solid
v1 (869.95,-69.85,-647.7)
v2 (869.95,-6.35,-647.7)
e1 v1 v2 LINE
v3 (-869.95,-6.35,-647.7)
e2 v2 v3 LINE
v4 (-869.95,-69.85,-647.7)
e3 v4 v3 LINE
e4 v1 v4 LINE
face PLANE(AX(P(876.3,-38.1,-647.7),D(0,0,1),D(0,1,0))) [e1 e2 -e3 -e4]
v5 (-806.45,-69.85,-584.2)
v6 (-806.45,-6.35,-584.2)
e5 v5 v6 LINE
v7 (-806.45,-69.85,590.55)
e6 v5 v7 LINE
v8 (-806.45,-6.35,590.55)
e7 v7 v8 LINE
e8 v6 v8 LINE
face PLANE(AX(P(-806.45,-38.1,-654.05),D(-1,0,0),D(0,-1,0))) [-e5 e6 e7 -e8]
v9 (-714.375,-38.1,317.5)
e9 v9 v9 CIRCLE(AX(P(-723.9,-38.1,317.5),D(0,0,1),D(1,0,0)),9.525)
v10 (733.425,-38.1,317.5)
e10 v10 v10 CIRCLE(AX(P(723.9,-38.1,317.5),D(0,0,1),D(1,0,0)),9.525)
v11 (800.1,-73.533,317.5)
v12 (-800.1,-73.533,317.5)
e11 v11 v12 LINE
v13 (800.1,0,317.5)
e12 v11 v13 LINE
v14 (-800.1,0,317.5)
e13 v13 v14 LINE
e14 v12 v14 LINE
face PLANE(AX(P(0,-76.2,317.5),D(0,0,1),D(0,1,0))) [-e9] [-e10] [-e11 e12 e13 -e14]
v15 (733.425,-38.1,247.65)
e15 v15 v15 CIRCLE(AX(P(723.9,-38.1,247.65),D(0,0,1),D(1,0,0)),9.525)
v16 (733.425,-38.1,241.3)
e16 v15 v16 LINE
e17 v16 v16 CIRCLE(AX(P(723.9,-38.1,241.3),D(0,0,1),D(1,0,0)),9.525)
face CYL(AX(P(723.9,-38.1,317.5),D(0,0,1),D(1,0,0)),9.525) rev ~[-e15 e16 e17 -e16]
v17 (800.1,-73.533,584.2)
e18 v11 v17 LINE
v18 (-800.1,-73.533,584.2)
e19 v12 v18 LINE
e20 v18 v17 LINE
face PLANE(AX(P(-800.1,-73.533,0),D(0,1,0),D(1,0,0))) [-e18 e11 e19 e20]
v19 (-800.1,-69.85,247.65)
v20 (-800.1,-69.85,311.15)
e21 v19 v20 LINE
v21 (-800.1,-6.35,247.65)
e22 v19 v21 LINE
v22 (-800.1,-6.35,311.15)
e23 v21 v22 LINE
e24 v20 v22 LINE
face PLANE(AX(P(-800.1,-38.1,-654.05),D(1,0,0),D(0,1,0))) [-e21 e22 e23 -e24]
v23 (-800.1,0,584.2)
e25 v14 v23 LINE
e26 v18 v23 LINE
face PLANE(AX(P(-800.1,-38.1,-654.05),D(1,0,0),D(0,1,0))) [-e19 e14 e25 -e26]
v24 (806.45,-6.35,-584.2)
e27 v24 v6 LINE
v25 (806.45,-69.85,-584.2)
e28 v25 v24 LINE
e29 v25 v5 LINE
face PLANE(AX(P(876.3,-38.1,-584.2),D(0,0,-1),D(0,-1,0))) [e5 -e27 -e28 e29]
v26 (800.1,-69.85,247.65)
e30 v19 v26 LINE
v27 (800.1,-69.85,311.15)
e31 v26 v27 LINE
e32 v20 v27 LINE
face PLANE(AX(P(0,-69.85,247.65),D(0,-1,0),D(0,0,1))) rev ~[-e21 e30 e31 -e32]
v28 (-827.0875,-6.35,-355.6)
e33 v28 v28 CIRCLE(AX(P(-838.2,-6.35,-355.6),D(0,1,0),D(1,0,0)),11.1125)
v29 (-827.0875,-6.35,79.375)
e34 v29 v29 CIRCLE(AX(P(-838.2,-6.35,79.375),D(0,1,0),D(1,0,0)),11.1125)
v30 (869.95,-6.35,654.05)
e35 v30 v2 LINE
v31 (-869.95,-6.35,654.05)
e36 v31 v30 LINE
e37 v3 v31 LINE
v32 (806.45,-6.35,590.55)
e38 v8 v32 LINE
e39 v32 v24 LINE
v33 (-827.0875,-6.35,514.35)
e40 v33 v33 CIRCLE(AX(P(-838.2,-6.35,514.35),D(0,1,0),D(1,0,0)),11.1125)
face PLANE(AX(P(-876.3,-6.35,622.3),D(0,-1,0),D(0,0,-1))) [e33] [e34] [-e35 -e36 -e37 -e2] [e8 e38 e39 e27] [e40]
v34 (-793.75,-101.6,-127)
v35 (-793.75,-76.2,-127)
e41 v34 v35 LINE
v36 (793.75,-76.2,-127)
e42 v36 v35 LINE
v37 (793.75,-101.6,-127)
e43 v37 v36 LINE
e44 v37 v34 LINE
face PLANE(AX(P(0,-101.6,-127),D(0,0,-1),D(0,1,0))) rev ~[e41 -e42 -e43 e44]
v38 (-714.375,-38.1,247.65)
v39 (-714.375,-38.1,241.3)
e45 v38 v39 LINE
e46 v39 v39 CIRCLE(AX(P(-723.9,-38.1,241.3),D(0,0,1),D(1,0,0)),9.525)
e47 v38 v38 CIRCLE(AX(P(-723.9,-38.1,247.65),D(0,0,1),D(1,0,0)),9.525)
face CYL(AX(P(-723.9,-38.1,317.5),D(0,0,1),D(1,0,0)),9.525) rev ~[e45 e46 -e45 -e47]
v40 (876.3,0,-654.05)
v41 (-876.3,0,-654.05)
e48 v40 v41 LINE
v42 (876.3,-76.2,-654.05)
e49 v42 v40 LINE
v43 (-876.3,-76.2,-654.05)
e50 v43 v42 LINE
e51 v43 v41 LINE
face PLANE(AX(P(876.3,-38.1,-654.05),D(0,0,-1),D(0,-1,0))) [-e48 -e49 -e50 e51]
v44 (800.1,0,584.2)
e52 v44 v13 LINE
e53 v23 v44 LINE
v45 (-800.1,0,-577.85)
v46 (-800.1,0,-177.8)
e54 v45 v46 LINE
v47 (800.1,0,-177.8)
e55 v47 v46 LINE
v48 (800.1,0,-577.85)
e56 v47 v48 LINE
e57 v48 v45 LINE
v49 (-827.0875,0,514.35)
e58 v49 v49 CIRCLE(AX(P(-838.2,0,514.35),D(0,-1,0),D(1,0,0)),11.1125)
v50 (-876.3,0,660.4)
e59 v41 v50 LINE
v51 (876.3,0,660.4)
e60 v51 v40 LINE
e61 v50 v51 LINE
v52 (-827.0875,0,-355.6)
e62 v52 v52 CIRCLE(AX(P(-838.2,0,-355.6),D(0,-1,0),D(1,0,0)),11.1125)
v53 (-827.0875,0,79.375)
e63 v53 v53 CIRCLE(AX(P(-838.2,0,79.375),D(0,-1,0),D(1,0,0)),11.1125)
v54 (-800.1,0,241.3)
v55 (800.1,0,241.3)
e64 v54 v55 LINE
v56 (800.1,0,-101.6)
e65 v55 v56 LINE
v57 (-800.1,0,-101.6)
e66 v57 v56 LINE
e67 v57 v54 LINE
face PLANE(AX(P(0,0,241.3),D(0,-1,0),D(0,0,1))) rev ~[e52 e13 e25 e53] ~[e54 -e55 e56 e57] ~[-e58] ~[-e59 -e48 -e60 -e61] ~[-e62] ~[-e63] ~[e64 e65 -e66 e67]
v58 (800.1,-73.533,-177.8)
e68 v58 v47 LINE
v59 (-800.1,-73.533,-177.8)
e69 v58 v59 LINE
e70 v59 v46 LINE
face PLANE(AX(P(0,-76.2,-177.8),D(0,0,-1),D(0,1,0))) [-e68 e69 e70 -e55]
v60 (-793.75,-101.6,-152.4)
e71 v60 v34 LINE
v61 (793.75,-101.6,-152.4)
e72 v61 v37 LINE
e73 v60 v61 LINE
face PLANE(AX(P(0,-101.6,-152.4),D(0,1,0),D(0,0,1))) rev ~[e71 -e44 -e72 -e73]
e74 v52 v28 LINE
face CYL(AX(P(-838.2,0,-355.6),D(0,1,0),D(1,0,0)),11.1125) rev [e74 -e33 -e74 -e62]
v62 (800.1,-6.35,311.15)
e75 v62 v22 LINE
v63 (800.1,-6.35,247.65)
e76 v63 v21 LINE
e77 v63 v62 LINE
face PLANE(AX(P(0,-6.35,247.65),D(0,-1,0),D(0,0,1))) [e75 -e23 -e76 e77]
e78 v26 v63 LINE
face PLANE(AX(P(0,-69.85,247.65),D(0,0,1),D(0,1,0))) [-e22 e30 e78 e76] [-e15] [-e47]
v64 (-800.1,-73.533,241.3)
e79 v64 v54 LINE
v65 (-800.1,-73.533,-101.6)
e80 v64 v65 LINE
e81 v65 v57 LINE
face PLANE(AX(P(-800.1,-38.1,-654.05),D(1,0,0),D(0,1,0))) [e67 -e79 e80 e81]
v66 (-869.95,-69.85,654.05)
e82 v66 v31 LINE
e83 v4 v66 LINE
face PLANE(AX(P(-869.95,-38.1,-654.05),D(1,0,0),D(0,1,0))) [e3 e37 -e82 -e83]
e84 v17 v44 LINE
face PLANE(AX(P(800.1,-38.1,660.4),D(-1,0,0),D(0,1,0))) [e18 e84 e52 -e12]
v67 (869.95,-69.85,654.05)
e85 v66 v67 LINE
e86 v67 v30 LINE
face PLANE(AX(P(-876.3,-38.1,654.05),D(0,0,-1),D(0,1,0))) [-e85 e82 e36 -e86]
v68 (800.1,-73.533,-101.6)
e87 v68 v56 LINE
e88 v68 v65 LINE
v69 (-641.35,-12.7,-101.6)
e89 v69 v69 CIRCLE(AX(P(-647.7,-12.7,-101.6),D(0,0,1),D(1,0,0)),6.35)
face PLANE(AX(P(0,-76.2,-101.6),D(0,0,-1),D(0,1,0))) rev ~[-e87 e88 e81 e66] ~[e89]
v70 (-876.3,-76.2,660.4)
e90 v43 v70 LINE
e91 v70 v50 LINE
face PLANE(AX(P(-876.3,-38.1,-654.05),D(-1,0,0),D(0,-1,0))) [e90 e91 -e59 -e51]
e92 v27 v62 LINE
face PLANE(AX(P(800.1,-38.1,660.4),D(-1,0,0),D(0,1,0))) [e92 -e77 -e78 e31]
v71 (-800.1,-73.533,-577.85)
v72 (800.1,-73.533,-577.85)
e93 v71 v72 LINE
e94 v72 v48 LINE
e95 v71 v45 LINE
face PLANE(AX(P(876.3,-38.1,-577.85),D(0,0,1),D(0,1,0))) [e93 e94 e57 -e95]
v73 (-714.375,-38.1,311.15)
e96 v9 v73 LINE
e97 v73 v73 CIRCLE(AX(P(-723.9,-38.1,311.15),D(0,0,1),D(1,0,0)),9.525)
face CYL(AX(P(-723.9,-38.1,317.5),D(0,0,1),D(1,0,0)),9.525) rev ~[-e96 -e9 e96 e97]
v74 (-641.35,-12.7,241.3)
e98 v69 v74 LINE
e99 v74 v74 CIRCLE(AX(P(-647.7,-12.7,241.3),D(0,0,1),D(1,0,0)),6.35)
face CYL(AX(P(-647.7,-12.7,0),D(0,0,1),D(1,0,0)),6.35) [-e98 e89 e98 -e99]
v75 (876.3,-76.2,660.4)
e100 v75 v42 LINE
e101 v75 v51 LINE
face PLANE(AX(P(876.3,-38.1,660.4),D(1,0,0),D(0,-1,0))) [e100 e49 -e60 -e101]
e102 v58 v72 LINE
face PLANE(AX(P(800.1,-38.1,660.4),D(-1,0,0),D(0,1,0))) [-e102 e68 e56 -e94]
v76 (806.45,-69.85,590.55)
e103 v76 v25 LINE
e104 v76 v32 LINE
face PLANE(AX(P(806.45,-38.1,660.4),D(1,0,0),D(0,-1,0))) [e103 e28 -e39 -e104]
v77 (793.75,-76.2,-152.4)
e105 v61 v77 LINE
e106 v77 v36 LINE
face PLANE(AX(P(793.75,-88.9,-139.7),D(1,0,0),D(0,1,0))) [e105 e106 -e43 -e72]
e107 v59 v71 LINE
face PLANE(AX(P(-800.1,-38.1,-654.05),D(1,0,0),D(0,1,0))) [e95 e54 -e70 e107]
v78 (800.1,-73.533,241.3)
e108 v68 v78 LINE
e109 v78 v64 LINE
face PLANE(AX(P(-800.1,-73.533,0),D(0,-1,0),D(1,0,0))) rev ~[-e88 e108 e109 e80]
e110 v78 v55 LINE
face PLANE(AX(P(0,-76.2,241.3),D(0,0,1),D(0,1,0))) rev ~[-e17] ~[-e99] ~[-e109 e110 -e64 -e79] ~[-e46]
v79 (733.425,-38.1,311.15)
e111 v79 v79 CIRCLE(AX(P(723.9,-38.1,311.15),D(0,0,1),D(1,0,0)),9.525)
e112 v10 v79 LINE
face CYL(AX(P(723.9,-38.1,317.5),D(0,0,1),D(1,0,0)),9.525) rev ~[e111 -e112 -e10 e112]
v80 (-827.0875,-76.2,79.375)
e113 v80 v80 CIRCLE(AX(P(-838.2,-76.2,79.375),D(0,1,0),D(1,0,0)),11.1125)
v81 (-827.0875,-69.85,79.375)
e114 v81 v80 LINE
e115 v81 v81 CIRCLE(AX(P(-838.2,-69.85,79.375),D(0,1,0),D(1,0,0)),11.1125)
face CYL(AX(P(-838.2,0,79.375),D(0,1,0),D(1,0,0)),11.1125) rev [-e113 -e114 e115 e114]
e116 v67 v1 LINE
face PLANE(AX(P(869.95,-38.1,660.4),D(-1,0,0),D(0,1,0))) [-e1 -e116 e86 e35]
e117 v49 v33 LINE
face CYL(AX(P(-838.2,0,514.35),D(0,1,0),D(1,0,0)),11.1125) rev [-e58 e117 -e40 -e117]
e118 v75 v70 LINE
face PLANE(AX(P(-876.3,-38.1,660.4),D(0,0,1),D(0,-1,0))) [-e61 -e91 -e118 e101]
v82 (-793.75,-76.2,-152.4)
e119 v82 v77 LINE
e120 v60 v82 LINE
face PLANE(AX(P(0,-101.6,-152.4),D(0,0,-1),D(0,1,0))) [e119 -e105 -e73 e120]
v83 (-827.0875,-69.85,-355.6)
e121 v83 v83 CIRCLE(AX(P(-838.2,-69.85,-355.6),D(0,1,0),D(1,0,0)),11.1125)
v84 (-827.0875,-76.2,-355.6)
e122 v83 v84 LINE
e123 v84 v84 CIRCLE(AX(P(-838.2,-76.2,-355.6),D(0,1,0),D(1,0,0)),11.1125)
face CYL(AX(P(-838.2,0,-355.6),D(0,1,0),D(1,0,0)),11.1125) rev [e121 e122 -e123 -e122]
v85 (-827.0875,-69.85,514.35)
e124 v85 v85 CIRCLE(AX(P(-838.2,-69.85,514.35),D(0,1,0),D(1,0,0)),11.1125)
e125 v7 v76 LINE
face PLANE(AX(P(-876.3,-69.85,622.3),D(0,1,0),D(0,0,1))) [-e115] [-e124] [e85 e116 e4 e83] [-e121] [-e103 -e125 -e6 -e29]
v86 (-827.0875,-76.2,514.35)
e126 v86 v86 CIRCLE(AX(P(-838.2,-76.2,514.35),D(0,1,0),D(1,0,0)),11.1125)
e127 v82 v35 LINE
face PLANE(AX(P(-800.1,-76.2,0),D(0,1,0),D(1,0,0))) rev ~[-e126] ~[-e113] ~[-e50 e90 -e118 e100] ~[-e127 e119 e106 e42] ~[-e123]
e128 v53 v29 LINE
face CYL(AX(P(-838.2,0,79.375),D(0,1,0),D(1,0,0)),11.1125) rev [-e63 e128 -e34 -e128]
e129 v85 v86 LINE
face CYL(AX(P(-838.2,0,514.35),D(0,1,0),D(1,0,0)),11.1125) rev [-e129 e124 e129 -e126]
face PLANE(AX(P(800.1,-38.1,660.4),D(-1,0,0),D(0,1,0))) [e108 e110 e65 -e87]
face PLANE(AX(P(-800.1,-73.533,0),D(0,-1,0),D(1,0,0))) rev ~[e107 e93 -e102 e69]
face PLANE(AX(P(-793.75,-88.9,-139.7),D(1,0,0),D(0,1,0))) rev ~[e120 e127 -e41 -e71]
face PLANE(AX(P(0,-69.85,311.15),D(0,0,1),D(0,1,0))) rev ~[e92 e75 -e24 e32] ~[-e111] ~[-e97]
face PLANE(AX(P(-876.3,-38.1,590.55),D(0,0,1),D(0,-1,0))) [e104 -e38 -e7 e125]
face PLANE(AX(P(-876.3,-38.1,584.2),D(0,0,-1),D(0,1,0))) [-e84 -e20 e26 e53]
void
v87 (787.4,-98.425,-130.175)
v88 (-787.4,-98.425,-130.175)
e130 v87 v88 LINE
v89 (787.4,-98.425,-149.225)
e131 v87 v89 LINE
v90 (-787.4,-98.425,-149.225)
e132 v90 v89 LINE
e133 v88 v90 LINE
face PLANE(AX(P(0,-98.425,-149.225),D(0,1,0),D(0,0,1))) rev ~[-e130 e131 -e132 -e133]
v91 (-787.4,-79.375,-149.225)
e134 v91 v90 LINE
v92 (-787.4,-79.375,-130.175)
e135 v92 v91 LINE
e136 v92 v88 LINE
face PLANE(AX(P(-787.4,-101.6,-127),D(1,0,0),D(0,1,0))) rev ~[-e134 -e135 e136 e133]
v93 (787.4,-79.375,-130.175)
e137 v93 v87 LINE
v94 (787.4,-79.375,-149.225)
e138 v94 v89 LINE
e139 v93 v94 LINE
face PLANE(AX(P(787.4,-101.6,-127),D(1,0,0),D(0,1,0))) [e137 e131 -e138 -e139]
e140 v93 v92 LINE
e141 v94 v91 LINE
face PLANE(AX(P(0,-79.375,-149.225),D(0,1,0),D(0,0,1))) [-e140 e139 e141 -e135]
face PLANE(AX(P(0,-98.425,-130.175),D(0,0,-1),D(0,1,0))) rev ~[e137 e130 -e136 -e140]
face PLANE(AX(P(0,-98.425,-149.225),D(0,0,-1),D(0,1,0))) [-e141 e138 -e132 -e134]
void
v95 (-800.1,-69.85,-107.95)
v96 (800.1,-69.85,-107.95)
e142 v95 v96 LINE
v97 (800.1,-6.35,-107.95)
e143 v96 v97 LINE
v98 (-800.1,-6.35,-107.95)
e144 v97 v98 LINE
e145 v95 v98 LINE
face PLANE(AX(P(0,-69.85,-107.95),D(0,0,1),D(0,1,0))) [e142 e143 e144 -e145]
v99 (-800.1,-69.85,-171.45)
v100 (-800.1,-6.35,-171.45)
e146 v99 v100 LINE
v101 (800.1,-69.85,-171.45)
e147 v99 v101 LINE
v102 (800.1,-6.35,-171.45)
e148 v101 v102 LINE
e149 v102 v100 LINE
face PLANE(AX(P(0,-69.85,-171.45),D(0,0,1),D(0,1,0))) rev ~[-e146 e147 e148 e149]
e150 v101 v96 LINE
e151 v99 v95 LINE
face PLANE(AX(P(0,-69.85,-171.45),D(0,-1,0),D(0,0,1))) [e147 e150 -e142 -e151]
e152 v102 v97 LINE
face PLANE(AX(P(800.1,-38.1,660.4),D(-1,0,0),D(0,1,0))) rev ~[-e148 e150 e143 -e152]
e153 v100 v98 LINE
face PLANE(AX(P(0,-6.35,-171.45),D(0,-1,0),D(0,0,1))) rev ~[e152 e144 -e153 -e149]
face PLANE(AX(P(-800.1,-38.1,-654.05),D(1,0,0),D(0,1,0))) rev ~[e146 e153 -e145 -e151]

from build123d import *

# Parameters (mm, degrees)
F1_W           = 76.2
F1_H           = 76.2
F1_W_2         = 63.5
F1_H_2         = 63.5
F3_W           = 76.2
F3_H           = 76.2
F3_W_2         = 63.5
F3_H_2         = 63.5
F4_DEPTH       = 800.1
F4_DEPTH_BACK  = 800.1
F5_W           = 25.4
F5_H           = 25.4
F5_W_2         = 19.05
F5_H_2         = 19.05
F6_DEPTH       = 793.75
F7_W           = 6.35
F7_H           = 25.4
F8_DEPTH       = 25.4
F9_W           = 1600.2
F9_H           = 2.667
F10_DEPTH      = 660.4
F10_DEPTH_BACK = 654.05
F11_R          = 11.1125
F12_DEPTH      = 101.601
F13_R          = 9.525
F14_DEPTH      = 76.2
F15_R          = 6.35
F16_DEPTH      = 241.3
F16_DEPTH_BACK = 101.6


# Not quite as in the source:
# - an extrude ends at something that could not be found from the text; its depth is read off the source's solid


with BuildPart() as f2:
    # F2: sweep along a path in F0
    with BuildLine(Plane.XZ) as f2_path:
        Line((-876.3, 660.4), (876.3, 660.4))
        Line((876.3, 660.4), (876.3, -654.05))
        Line((876.3, -654.05), (-876.3, -654.05))
        Line((-876.3, -654.05), (-876.3, 660.4))
    # F1 (on Top) → F2 (sweep)
    with BuildSketch(Plane.XY):
        with Locations((-838.2, -38.1)):
            Rectangle(F1_W, F1_H)
        with Locations((-838.2, -38.1)):
            Rectangle(F1_W_2, F1_H_2, mode=Mode.SUBTRACT)
    sweep(path=f2_path.line, transition=Transition.RIGHT)

    # F3 (on Right) → F4 (join, two sides)
    with BuildSketch(Plane.YZ) as f4_sk:
        with Locations((-38.1, 279.4)):
            Rectangle(F3_W, F3_H)
        with Locations((-38.1, 279.4)):
            Rectangle(F3_W_2, F3_H_2, mode=Mode.SUBTRACT)
        with Locations((-38.1, -139.7)):
            Rectangle(F3_W, F3_H)
        with Locations((-38.1, -139.7)):
            Rectangle(F3_W_2, F3_H_2, mode=Mode.SUBTRACT)
    extrude(amount=-F4_DEPTH)
    extrude(f4_sk.sketch, amount=F4_DEPTH_BACK)

    # F5 (on Right) → F6 (join, symmetric)
    with BuildSketch(Plane.YZ):
        with Locations((-88.9, -139.7)):
            Rectangle(F5_W, F5_H)
        with Locations((-88.9, -139.7)):
            Rectangle(F5_W_2, F5_H_2, mode=Mode.SUBTRACT)
    extrude(amount=F6_DEPTH, both=True)

    # F7 (on face) → F8 (join, through all)
    with BuildSketch(Plane.XY.offset(-127)):
        with Locations((790.575, -88.9)):
            Rectangle(F7_W, F7_H)
        with Locations((-790.575, -88.9)):
            Rectangle(F7_W, F7_H)
    extrude(amount=-F8_DEPTH)

    # F9 (on Top) → F10 (join, two sides)
    with BuildSketch(Plane.XY) as f10_sk:
        with Locations((0, -74.8665)):
            Rectangle(F9_W, F9_H)
    extrude(amount=F10_DEPTH)
    extrude(f10_sk.sketch, amount=-F10_DEPTH_BACK)

    # F11 (on Front) → F12 (cut, through all)
    with BuildSketch(Plane.XZ):
        with Locations((-838.2, 514.35)):
            Circle(F11_R)
        with Locations((-838.2, 79.375)):
            Circle(F11_R)
        with Locations((-838.2, -355.6)):
            Circle(F11_R)
    extrude(amount=F12_DEPTH, mode=Mode.SUBTRACT)

    # F13 (on face) → F14 (cut, through all)
    with BuildSketch(Plane.XY.offset(317.5)):
        with Locations((-723.9, -38.1)):
            Circle(F13_R)
        with Locations((723.9, -38.1)):
            Circle(F13_R)
    extrude(amount=-F14_DEPTH, mode=Mode.SUBTRACT)

    # F15 (on Top) → F16 (join, two sides)
    with BuildSketch(Plane.XY) as f16_sk:
        with Locations((-647.7, -12.7)):
            Circle(F15_R)
    extrude(amount=F16_DEPTH)
    extrude(f16_sk.sketch, amount=-F16_DEPTH_BACK)


solid = f2.part
